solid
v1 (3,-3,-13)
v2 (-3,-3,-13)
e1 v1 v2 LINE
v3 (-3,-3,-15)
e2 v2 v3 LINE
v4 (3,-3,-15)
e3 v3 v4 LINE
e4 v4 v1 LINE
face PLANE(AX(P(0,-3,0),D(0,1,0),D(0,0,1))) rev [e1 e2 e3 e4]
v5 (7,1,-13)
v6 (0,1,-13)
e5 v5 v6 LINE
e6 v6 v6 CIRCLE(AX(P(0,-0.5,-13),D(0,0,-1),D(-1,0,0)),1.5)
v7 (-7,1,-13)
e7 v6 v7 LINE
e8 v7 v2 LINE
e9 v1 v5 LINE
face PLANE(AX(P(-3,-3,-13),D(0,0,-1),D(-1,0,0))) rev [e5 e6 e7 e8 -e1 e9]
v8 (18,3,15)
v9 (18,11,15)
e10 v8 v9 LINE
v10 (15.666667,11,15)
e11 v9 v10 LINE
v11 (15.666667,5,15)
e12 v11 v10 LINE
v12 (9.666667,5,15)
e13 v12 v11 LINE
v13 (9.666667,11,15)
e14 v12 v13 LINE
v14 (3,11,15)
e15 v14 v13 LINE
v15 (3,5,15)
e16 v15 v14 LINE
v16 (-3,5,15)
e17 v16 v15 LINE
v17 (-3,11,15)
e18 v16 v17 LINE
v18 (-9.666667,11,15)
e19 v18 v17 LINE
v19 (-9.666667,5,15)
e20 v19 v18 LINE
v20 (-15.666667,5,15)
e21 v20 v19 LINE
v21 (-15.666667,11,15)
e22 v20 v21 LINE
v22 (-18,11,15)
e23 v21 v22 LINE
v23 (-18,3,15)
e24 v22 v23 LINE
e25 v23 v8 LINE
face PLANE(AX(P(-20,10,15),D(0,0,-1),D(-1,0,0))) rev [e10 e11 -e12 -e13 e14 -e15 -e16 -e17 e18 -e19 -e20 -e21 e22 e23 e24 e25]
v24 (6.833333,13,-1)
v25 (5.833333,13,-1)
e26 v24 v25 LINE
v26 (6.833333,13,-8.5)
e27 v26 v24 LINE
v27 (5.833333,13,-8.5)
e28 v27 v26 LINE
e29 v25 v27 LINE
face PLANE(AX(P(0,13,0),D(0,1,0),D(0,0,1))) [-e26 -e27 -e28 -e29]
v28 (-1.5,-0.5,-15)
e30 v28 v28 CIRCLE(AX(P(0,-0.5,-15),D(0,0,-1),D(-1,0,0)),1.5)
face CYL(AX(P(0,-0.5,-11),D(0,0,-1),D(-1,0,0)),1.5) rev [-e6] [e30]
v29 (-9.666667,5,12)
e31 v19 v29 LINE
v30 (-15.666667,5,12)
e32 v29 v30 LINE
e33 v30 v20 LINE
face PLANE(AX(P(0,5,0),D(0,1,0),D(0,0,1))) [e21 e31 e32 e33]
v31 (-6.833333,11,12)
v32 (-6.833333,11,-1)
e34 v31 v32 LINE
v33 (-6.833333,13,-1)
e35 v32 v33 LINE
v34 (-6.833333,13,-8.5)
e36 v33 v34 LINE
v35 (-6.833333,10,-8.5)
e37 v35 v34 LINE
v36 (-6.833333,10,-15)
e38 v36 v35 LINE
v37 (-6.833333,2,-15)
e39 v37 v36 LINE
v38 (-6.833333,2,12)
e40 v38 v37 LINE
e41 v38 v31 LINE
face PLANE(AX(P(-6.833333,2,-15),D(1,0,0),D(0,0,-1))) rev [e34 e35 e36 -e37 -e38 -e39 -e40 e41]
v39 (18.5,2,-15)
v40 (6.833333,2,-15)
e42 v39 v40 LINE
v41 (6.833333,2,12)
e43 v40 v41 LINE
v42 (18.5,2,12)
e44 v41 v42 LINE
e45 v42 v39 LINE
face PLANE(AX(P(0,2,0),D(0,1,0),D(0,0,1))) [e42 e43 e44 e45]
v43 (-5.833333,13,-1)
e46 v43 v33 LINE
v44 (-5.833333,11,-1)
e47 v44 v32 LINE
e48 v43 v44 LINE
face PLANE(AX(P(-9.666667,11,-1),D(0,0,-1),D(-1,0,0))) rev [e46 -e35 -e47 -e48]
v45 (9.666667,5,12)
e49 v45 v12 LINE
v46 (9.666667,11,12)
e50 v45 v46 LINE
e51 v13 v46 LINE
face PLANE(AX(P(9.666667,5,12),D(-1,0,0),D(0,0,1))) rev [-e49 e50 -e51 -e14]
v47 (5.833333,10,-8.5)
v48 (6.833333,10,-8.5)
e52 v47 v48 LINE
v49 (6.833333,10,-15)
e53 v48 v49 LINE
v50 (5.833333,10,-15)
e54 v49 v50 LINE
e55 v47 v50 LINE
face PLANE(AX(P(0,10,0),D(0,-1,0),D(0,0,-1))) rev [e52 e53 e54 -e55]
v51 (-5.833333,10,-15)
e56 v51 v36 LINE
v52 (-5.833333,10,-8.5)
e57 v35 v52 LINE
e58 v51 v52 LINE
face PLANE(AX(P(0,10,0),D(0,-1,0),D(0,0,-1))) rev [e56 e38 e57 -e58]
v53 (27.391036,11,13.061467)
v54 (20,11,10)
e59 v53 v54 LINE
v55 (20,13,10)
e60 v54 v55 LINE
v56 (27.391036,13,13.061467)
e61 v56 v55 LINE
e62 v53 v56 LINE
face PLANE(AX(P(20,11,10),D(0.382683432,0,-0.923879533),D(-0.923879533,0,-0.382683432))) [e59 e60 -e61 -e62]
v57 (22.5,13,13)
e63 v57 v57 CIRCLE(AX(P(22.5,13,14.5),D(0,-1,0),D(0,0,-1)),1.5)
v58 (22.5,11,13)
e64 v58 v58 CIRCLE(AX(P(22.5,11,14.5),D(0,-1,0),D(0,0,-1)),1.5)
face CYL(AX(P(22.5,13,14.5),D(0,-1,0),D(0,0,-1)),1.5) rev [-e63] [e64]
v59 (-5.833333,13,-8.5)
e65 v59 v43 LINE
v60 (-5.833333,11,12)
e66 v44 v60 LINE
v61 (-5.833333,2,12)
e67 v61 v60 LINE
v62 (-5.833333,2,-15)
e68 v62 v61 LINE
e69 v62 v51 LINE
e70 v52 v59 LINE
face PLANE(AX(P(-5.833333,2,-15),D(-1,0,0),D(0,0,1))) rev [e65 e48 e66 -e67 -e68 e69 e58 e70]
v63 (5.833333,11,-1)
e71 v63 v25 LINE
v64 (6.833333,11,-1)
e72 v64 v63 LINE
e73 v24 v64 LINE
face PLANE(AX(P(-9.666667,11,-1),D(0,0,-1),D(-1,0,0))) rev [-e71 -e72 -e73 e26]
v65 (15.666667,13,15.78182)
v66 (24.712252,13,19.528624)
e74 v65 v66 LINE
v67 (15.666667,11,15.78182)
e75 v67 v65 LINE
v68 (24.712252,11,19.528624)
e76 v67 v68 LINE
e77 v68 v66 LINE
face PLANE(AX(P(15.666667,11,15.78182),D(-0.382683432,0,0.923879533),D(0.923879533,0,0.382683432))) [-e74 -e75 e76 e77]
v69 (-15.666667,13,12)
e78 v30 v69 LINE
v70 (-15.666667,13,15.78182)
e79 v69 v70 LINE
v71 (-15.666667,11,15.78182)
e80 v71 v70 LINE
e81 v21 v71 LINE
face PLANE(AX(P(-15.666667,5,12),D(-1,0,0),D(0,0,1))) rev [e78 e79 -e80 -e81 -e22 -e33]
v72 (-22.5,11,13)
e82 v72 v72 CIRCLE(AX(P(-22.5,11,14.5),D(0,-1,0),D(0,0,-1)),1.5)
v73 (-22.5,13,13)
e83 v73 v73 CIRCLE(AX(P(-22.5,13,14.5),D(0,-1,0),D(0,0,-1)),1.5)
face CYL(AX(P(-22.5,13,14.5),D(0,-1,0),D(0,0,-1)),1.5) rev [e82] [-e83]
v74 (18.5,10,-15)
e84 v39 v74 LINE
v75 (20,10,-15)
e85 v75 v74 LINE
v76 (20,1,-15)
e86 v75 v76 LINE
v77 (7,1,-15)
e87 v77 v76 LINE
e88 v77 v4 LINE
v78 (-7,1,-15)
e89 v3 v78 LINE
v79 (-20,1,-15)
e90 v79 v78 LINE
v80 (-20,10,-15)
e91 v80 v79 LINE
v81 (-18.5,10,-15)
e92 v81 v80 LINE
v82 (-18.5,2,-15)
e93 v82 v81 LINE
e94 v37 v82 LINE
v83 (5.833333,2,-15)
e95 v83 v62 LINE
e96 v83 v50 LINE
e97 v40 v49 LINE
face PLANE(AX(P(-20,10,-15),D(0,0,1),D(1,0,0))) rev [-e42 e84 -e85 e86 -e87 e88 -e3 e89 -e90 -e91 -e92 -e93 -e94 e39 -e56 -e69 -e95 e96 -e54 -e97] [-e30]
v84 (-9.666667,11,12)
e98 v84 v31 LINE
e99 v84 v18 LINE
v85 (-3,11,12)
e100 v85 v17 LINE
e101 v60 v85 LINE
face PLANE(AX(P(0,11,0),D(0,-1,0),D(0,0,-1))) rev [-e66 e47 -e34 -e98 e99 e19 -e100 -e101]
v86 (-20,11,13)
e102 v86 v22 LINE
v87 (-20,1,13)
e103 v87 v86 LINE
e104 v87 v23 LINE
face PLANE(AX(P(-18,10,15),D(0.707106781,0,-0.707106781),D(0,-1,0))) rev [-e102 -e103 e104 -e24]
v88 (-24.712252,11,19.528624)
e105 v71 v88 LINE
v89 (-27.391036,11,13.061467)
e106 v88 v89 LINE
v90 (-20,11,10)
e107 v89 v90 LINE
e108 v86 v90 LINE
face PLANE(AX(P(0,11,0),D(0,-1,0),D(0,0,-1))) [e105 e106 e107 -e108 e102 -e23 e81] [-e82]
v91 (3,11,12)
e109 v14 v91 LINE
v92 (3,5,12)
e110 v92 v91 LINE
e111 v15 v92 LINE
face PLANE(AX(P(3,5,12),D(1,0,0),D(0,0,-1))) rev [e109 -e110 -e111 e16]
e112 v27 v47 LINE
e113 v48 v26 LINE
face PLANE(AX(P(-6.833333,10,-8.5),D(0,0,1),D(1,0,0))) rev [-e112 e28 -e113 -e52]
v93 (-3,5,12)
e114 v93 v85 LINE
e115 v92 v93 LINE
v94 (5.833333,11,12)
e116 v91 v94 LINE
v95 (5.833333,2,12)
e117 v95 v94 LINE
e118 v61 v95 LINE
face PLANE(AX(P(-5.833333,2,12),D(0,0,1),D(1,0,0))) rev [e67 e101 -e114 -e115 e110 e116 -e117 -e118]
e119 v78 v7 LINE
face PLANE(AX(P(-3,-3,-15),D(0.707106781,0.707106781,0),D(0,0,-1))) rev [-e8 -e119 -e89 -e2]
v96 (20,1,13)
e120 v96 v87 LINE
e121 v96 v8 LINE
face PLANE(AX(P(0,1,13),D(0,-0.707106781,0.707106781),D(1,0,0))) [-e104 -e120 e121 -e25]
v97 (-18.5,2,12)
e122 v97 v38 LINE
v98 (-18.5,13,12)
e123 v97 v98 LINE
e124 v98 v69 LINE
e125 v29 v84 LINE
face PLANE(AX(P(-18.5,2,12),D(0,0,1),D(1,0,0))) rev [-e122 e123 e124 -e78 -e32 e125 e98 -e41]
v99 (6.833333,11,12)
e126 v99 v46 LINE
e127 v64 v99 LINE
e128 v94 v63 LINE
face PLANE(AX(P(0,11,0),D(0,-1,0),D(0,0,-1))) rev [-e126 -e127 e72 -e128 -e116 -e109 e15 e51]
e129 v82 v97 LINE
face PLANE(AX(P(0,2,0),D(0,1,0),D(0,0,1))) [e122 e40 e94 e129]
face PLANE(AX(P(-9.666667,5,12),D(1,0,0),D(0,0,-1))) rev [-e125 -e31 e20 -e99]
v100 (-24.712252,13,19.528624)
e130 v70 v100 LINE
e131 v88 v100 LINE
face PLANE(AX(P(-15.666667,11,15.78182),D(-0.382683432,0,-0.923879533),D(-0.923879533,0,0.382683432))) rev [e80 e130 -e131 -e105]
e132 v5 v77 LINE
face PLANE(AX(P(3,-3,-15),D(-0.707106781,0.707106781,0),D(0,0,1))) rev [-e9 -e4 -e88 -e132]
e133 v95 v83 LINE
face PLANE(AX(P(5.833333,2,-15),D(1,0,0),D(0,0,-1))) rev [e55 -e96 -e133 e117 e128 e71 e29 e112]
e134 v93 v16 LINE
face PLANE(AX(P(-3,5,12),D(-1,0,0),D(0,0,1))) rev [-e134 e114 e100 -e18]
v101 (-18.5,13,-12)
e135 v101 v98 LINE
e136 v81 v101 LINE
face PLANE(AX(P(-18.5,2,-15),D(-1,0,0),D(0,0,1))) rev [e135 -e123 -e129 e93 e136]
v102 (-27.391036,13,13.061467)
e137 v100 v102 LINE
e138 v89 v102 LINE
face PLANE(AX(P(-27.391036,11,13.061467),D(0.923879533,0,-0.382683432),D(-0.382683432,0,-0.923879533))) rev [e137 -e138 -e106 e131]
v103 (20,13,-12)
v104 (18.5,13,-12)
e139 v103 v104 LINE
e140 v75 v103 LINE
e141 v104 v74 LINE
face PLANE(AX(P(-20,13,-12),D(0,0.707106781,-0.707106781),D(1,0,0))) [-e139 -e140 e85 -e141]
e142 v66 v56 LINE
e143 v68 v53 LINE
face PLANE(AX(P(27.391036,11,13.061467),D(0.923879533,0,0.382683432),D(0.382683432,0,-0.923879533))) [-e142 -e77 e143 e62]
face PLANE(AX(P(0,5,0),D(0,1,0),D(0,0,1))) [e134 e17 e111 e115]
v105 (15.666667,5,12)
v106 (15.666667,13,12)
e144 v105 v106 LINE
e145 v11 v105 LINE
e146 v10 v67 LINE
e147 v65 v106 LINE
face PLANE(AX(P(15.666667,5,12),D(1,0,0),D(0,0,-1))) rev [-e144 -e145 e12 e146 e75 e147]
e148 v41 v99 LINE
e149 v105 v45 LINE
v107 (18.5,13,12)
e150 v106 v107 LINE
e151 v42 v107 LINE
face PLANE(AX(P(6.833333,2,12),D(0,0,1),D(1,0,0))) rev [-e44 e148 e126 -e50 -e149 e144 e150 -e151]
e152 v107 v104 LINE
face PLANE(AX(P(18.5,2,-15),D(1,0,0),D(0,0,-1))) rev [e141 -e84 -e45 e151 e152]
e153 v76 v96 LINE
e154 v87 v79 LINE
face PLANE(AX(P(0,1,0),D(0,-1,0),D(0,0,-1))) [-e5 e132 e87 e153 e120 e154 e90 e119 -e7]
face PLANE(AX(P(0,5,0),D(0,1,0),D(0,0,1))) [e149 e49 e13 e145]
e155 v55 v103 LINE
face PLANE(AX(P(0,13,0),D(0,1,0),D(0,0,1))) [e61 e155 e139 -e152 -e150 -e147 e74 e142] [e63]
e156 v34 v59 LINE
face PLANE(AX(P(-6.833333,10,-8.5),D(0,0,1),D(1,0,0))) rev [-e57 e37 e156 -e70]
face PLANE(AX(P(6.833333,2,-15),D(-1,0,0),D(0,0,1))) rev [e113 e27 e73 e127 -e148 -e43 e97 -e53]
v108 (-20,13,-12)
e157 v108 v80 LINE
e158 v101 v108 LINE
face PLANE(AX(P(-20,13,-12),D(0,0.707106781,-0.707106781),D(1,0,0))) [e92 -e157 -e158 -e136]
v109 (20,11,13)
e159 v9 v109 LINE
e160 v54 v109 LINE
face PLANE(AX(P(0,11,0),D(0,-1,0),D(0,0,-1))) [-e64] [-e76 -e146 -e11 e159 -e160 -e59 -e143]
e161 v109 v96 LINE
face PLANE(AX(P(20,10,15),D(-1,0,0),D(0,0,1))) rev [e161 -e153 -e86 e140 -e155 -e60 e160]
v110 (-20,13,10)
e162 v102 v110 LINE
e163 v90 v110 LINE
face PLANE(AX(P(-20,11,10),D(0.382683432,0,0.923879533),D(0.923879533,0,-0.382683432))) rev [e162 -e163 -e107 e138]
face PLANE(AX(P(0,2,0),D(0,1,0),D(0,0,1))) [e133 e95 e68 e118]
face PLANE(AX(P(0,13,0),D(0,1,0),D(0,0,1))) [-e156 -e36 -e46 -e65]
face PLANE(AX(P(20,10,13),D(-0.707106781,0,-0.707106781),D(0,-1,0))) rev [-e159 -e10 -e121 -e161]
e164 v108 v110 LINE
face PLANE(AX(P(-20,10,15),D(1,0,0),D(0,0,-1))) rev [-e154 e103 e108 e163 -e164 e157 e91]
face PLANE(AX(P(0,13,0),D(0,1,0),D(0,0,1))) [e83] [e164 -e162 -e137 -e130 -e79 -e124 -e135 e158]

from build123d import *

# Parameters (mm, degrees)
SKETCH1_W           = 40
SKETCH1_H           = 30
BOSS_EXTRUDE1_DEPTH = 10
SKETCH5_W           = 40
SKETCH5_H           = 27
BOSS_EXTRUDE2_DEPTH = 3
SKETCH2_W           = 11.666666667
SKETCH2_H           = 27
SKETCH2_W_2         = 11.666666666
CUT_EXTRUDE1_DEPTH  = 11
SKETCH4_W           = 6
SKETCH4_H           = 3
CUT_EXTRUDE2_DEPTH  = 8
SKETCH6_W           = 19.333333334
SKETCH6_H           = 16
CUT_EXTRUDE3_DEPTH  = 2
CHAMFER2_SIZE       = 3
BOSS_EXTRUDE3_DEPTH = 2
SKETCH9_R           = 1.5
CUT_EXTRUDE5_DEPTH  = 2
SKETCH11_W          = 40
SKETCH11_H          = 30
CUT_EXTRUDE6_DEPTH  = 1
CHAMFER3_SIZE       = 2
SKETCH14_W          = 6
SKETCH14_H          = 2
BOSS_EXTRUDE4_DEPTH = 4
SKETCH15_R          = 1.5
CUT_EXTRUDE7_DEPTH  = 4
CHAMFER7_SIZE       = 4
SKETCH16_W          = 13.666666666
SKETCH16_H          = 6.5
CUT_EXTRUDE8_DEPTH  = 3


with BuildPart() as part:
    # Sketch1 → Boss-Extrude1 (new body)
    with BuildSketch(Plane(origin=(0, 0, 0), x_dir=(1, 0, 0), z_dir=(0, 1, 0))):
        Rectangle(SKETCH1_W, SKETCH1_H)
    extrude(amount=BOSS_EXTRUDE1_DEPTH)

    # Sketch5 → Boss-Extrude2 (add)
    with BuildSketch(Plane(origin=(0, 10, 0), x_dir=(1, 0, 0), z_dir=(0, 1, 0))):
        with Locations((0, -1.5)):
            Rectangle(SKETCH5_W, SKETCH5_H)
    extrude(amount=BOSS_EXTRUDE2_DEPTH)

    # Sketch2 → Cut-Extrude1 (cut)
    with BuildSketch(Plane(origin=(0, 13, 0), x_dir=(1, 0, 0), z_dir=(0, 1, 0))):
        with Locations((-12.666666666, 1.5)):
            Rectangle(SKETCH2_W, SKETCH2_H)
        with Locations((0, 1.5)):
            Rectangle(SKETCH2_W_2, SKETCH2_H)
        with Locations((12.666666666, 1.5)):
            Rectangle(SKETCH2_W, SKETCH2_H)
    extrude(amount=-CUT_EXTRUDE1_DEPTH, mode=Mode.SUBTRACT)

    # Sketch4 → Cut-Extrude2 (cut)
    with BuildSketch(Plane(origin=(0, 13, 0), x_dir=(1, 0, 0), z_dir=(0, 1, 0))):
        with Locations((-12.666666667, -13.5)):
            Rectangle(SKETCH4_W, SKETCH4_H)
        with Locations((0, -13.5)):
            Rectangle(SKETCH4_W, SKETCH4_H)
        with Locations((12.666666667, -13.5)):
            Rectangle(SKETCH4_W, SKETCH4_H)
    extrude(amount=-CUT_EXTRUDE2_DEPTH, mode=Mode.SUBTRACT)

    # Sketch6 → Cut-Extrude3 (cut)
    with BuildSketch(Plane(origin=(0, 13, 0), x_dir=(1, 0, 0), z_dir=(0, 1, 0))):
        with Locations((0, -7)):
            Rectangle(SKETCH6_W, SKETCH6_H)
    extrude(amount=-CUT_EXTRUDE3_DEPTH, mode=Mode.SUBTRACT)

    # Chamfer2
    chamfer2_edges = [part.edges().sort_by_distance(p)[0] for p in [
        (19.25, 10, -12),
        (6.333333333, 10, -12),
        (-6.333333333, 10, -12),
        (-19.25, 10, -12),
    ]]
    chamfer(chamfer2_edges, length=CHAMFER2_SIZE - 0.0001)  # a hair under: the kernel refuses the full size

    # Sketch8 → Boss-Extrude3 (add)
    with BuildSketch(Plane(origin=(0, 13, 0), x_dir=(1, 0, 0), z_dir=(0, 1, 0))):
        Polygon((20, -10), (27.39103626, -13.061467459), (24.712252234, -19.528624186), (15.666666667, -15.781819965), (15.666666667, -15), (18.5, -12), align=None)
    boss_extrude3 = extrude(amount=-BOSS_EXTRUDE3_DEPTH)

    # Mirror1: Boss-Extrude3 across plane
    add(boss_extrude3.mirror(Plane(origin=(0, 0, 0), x_dir=(0, 0, 1), z_dir=(1, 0, 0))))

    # Sketch9 → Cut-Extrude5 (cut)
    with BuildSketch(Plane.XZ.offset(-11)):
        with Locations(Location((-22.5, 14.5, 0), (0, 0, 270))):
            Circle(SKETCH9_R)
        with Locations(Location((22.5, 14.5, 0), (0, 0, 270))):
            Circle(SKETCH9_R)
    extrude(amount=-CUT_EXTRUDE5_DEPTH, mode=Mode.SUBTRACT)

    # Sketch11 → Cut-Extrude6 (cut)
    with BuildSketch(Plane.XZ):
        Rectangle(SKETCH11_W, SKETCH11_H)
    extrude(amount=-CUT_EXTRUDE6_DEPTH, mode=Mode.SUBTRACT)

    # Chamfer3
    chamfer3_edges = [part.edges().sort_by_distance(p)[0] for p in [
        (20, 6, 15),
        (-20, 6, 15),
        (0, 1, 15),
    ]]
    chamfer(chamfer3_edges, length=CHAMFER3_SIZE)

    # Sketch14 → Boss-Extrude4 (add)
    with BuildSketch(Plane.XZ.offset(-1)):
        with Locations((0, -14)):
            Rectangle(SKETCH14_W, SKETCH14_H)
    extrude(amount=BOSS_EXTRUDE4_DEPTH)

    # Sketch15 → Cut-Extrude7 (cut)
    with BuildSketch(Plane(origin=(0, 0, -15), x_dir=(-1, 0, 0), z_dir=(0, 0, -1))):
        with Locations((0, -0.5)):
            Circle(SKETCH15_R)
    extrude(amount=-CUT_EXTRUDE7_DEPTH, mode=Mode.SUBTRACT)

    # Chamfer7
    chamfer7_edges = [part.edges().sort_by_distance(p)[0] for p in [
        (3, 1, -14),
        (-3, 1, -14),
    ]]
    chamfer(chamfer7_edges, length=CHAMFER7_SIZE - 0.0001)  # a hair under: the kernel refuses the full size

    # Sketch16 → Cut-Extrude8 (cut)
    with BuildSketch(Plane(origin=(0, 13, 0), x_dir=(1, 0, 0), z_dir=(0, 1, 0))):
        with Locations((0, 11.75)):
            Rectangle(SKETCH16_W, SKETCH16_H)
    extrude(amount=-CUT_EXTRUDE8_DEPTH, mode=Mode.SUBTRACT)


solid = part.part
